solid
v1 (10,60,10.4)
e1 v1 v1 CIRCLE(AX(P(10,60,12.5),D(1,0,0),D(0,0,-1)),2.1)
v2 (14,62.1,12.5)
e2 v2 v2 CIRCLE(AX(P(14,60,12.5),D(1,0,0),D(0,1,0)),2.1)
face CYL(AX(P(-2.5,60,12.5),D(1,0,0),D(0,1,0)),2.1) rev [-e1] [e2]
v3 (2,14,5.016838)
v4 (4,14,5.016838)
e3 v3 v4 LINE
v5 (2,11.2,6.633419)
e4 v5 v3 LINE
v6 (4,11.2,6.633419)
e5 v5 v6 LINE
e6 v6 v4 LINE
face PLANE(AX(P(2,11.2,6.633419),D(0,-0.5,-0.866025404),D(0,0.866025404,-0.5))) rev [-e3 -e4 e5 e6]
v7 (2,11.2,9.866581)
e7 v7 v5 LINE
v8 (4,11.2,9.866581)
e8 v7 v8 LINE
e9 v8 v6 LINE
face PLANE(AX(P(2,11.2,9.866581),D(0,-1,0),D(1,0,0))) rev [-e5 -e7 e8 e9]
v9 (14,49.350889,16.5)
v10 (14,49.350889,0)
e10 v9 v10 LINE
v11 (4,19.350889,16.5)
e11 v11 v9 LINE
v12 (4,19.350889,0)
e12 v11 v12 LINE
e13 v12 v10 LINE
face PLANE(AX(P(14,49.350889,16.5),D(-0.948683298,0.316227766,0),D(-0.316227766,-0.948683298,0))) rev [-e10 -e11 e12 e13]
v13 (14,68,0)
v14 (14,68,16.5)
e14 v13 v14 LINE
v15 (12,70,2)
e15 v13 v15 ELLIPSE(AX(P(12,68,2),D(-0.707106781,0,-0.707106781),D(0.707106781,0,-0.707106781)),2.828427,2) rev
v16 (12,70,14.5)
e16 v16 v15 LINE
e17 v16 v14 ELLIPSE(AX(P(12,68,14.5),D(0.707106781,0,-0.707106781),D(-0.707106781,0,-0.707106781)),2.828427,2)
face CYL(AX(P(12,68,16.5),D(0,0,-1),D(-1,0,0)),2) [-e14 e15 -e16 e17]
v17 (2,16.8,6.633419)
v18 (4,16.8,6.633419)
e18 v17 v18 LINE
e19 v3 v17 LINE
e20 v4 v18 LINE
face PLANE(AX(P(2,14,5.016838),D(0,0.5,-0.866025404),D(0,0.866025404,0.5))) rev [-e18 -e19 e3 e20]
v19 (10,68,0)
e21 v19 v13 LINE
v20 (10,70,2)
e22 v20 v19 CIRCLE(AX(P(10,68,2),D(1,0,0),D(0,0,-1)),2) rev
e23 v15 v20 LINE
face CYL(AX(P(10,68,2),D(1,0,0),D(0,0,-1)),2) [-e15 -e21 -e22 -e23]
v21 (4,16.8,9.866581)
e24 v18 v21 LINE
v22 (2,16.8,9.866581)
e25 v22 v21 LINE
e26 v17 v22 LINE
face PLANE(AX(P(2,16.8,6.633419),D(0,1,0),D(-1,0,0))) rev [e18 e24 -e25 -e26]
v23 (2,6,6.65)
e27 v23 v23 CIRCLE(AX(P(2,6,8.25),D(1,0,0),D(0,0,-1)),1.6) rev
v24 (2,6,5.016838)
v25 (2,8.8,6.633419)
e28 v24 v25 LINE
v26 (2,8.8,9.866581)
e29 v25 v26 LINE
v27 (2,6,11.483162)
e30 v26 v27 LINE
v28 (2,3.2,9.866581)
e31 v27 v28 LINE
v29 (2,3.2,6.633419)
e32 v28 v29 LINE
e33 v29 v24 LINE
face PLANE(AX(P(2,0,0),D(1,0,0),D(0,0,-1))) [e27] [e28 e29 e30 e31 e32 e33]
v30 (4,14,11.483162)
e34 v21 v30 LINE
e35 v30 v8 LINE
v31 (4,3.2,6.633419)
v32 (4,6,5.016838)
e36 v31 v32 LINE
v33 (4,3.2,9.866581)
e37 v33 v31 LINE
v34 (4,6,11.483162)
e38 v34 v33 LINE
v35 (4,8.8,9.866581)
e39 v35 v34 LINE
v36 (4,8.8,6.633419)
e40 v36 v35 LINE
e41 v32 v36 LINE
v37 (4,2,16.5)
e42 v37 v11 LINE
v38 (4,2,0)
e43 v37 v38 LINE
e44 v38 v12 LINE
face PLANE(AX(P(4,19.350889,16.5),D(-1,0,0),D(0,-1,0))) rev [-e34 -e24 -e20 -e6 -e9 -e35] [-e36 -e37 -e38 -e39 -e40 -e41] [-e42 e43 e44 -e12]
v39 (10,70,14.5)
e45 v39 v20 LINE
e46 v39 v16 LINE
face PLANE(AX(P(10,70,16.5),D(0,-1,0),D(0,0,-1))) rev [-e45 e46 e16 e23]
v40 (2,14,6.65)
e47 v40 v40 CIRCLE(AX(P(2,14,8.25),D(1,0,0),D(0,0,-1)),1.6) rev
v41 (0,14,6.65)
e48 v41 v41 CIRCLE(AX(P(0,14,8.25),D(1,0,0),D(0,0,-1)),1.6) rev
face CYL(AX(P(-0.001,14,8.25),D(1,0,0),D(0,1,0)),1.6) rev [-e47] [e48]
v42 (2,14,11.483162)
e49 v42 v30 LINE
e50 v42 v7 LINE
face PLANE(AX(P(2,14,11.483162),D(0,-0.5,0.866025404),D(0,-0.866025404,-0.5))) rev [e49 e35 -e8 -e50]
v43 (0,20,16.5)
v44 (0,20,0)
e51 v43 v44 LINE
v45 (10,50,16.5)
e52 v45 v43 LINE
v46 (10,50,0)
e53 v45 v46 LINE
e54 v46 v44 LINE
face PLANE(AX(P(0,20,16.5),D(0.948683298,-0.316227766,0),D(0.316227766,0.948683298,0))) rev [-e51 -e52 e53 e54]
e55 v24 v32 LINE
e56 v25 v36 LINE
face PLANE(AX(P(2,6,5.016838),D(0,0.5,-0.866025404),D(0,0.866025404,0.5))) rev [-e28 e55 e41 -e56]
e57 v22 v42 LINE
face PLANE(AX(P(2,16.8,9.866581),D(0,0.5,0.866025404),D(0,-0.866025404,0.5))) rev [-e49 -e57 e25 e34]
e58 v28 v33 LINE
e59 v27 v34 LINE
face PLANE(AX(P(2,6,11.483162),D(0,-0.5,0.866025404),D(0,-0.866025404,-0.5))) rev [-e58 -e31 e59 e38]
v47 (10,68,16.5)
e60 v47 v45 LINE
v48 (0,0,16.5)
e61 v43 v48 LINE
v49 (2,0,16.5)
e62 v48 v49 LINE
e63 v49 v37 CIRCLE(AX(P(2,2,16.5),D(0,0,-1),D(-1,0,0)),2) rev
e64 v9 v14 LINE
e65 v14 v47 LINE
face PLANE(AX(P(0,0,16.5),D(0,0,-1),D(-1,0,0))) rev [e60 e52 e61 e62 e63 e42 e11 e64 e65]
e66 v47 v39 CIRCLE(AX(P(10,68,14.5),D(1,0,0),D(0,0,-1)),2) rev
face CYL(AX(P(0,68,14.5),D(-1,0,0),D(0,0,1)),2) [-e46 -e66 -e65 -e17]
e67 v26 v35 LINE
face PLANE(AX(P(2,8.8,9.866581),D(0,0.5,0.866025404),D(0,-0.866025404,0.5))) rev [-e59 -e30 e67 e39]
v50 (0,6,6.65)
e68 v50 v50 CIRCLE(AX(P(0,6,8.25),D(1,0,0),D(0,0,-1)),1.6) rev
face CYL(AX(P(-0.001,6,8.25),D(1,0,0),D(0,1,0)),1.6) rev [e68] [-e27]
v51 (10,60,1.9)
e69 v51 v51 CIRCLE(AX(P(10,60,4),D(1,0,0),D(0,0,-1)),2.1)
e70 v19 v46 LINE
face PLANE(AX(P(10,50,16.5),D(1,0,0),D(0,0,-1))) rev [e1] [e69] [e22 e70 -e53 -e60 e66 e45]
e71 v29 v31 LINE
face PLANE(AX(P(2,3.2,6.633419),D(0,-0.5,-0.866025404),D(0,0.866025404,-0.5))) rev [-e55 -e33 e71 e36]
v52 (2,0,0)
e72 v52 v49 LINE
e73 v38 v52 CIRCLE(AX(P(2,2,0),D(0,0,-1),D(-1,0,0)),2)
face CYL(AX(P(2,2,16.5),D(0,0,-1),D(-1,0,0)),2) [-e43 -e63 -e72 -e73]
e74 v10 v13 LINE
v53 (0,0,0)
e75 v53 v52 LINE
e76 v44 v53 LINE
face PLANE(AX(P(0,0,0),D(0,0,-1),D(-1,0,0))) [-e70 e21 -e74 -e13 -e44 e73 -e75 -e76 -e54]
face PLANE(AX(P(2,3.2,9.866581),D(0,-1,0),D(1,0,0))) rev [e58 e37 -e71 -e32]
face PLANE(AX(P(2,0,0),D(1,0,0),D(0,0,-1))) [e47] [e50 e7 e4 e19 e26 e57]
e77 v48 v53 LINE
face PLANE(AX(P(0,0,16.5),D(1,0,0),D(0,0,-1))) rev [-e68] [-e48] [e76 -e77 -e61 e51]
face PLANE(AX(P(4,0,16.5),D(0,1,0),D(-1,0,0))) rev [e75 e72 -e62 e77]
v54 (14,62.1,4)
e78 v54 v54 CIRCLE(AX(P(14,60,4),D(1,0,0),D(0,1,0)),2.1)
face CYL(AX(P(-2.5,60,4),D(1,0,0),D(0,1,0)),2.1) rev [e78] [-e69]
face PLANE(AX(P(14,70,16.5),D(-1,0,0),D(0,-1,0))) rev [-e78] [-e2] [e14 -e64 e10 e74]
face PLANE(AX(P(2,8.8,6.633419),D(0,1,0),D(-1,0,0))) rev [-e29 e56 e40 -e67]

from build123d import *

# Parameters (mm, degrees)
BOSS_EXTRUDE2_DEPTH = 16.5
SKETCH4_R           = 2.1
CUT_EXTRUDE2_DEPTH  = 16.5
CUT_EXTRUDE3_REACH  = 74.61
SKETCH5_R           = 1.6
FILLET1_R           = 2
FILLET2_R           = 2
CUT_EXTRUDE4_DEPTH  = 2


with BuildPart() as part:
    # Sketch3 → Boss-Extrude2 (new body)
    with BuildSketch(Plane.XY):
        Polygon((0, 0), (0, 20), (10, 50), (10, 70), (14, 70), (14, 49.350889359), (4, 19.350889359), (4, 0), align=None)
    extrude(amount=BOSS_EXTRUDE2_DEPTH)

    # Sketch4 → Cut-Extrude2 (cut)
    with BuildSketch(Plane(origin=(14, 0, 0), x_dir=(0, 0, -1), z_dir=(1, 0, 0))):
        with Locations(Location((-12.5, 60, 0), (0, 0, 90))):
            Circle(SKETCH4_R)
        with Locations(Location((-4, 60, 0), (0, 0, 90))):
            Circle(SKETCH4_R)
    extrude(amount=-CUT_EXTRUDE2_DEPTH, mode=Mode.SUBTRACT)

    # Sketch5 → Cut-Extrude3 (cut, up to next)
    with BuildSketch(Plane(origin=(4, 0, 0), x_dir=(0, 0, -1), z_dir=(1, 0, 0)), mode=Mode.PRIVATE) as cut_extrude3_sk1:
        with Locations(Location((-8.25, 14, 0), (0, 0, 90))):
            Circle(SKETCH5_R)
    cut_extrude3_tool1 = extrude(cut_extrude3_sk1.sketch, amount=-CUT_EXTRUDE3_REACH, mode=Mode.PRIVATE) & part.part
    # Sketch5 → Cut-Extrude3 (cut, up to next)
    with BuildSketch(Plane(origin=(4, 0, 0), x_dir=(0, 0, -1), z_dir=(1, 0, 0)), mode=Mode.PRIVATE) as cut_extrude3_sk2:
        with Locations(Location((-8.25, 6, 0), (0, 0, 90))):
            Circle(SKETCH5_R)
    cut_extrude3_tool2 = extrude(cut_extrude3_sk2.sketch, amount=-CUT_EXTRUDE3_REACH, mode=Mode.PRIVATE) & part.part
    add(cut_extrude3_tool1.solids().sort_by_distance((4, 14, 8.25))[0], mode=Mode.SUBTRACT)
    add(cut_extrude3_tool2.solids().sort_by_distance((4, 6, 8.25))[0], mode=Mode.SUBTRACT)

    # Fillet1
    fillet1_edges = [part.edges().sort_by_distance(p)[0] for p in [
        (14, 70, 8.25),
        (4, 0, 8.25),
    ]]
    fillet(fillet1_edges, radius=FILLET1_R)

    # Fillet2
    # the kernel refuses this fillet: 2 mm, written as the material it takes off along each edge
    with BuildSketch(Plane(origin=(5, 70, 0), x_dir=(0, -1, 0), z_dir=(1, 0, 0))) as fillet2_piece_1:
        with BuildLine():
            CenterArc((FILLET2_R, -FILLET2_R), FILLET2_R, 90, 90)
            Line((0, -FILLET2_R), (0, 0))
            Line((0, 0), (FILLET2_R, 0))
        make_face()
    extrude(amount=12, mode=Mode.SUBTRACT)
    with BuildSketch(Plane(origin=(5, 70, 16.5), x_dir=(0, -1, 0), z_dir=(1, 0, 0))) as fillet2_piece_2:
        with BuildLine():
            CenterArc((FILLET2_R, FILLET2_R), FILLET2_R, 180, 90)
            Line((0, FILLET2_R), (0, 0))
            Line((0, 0), (FILLET2_R, 0))
        make_face()
    extrude(amount=12, mode=Mode.SUBTRACT)

    # Sketch6 → Cut-Extrude4 (cut)
    with BuildSketch(Plane(origin=(4, 0, 0), x_dir=(0, 0, -1), z_dir=(1, 0, 0))):
        Polygon((-5.016838493, 14), (-6.633419246, 16.8), (-9.866580754, 16.8), (-11.483161507, 14), (-9.866580754, 11.2), (-6.633419246, 11.2), align=None)
        Polygon((-6.633419246, 8.8), (-9.866580754, 8.8), (-11.483161507, 6), (-9.866580754, 3.2), (-6.633419246, 3.2), (-5.016838493, 6), align=None)
    extrude(amount=-CUT_EXTRUDE4_DEPTH, mode=Mode.SUBTRACT)


solid = part.part
